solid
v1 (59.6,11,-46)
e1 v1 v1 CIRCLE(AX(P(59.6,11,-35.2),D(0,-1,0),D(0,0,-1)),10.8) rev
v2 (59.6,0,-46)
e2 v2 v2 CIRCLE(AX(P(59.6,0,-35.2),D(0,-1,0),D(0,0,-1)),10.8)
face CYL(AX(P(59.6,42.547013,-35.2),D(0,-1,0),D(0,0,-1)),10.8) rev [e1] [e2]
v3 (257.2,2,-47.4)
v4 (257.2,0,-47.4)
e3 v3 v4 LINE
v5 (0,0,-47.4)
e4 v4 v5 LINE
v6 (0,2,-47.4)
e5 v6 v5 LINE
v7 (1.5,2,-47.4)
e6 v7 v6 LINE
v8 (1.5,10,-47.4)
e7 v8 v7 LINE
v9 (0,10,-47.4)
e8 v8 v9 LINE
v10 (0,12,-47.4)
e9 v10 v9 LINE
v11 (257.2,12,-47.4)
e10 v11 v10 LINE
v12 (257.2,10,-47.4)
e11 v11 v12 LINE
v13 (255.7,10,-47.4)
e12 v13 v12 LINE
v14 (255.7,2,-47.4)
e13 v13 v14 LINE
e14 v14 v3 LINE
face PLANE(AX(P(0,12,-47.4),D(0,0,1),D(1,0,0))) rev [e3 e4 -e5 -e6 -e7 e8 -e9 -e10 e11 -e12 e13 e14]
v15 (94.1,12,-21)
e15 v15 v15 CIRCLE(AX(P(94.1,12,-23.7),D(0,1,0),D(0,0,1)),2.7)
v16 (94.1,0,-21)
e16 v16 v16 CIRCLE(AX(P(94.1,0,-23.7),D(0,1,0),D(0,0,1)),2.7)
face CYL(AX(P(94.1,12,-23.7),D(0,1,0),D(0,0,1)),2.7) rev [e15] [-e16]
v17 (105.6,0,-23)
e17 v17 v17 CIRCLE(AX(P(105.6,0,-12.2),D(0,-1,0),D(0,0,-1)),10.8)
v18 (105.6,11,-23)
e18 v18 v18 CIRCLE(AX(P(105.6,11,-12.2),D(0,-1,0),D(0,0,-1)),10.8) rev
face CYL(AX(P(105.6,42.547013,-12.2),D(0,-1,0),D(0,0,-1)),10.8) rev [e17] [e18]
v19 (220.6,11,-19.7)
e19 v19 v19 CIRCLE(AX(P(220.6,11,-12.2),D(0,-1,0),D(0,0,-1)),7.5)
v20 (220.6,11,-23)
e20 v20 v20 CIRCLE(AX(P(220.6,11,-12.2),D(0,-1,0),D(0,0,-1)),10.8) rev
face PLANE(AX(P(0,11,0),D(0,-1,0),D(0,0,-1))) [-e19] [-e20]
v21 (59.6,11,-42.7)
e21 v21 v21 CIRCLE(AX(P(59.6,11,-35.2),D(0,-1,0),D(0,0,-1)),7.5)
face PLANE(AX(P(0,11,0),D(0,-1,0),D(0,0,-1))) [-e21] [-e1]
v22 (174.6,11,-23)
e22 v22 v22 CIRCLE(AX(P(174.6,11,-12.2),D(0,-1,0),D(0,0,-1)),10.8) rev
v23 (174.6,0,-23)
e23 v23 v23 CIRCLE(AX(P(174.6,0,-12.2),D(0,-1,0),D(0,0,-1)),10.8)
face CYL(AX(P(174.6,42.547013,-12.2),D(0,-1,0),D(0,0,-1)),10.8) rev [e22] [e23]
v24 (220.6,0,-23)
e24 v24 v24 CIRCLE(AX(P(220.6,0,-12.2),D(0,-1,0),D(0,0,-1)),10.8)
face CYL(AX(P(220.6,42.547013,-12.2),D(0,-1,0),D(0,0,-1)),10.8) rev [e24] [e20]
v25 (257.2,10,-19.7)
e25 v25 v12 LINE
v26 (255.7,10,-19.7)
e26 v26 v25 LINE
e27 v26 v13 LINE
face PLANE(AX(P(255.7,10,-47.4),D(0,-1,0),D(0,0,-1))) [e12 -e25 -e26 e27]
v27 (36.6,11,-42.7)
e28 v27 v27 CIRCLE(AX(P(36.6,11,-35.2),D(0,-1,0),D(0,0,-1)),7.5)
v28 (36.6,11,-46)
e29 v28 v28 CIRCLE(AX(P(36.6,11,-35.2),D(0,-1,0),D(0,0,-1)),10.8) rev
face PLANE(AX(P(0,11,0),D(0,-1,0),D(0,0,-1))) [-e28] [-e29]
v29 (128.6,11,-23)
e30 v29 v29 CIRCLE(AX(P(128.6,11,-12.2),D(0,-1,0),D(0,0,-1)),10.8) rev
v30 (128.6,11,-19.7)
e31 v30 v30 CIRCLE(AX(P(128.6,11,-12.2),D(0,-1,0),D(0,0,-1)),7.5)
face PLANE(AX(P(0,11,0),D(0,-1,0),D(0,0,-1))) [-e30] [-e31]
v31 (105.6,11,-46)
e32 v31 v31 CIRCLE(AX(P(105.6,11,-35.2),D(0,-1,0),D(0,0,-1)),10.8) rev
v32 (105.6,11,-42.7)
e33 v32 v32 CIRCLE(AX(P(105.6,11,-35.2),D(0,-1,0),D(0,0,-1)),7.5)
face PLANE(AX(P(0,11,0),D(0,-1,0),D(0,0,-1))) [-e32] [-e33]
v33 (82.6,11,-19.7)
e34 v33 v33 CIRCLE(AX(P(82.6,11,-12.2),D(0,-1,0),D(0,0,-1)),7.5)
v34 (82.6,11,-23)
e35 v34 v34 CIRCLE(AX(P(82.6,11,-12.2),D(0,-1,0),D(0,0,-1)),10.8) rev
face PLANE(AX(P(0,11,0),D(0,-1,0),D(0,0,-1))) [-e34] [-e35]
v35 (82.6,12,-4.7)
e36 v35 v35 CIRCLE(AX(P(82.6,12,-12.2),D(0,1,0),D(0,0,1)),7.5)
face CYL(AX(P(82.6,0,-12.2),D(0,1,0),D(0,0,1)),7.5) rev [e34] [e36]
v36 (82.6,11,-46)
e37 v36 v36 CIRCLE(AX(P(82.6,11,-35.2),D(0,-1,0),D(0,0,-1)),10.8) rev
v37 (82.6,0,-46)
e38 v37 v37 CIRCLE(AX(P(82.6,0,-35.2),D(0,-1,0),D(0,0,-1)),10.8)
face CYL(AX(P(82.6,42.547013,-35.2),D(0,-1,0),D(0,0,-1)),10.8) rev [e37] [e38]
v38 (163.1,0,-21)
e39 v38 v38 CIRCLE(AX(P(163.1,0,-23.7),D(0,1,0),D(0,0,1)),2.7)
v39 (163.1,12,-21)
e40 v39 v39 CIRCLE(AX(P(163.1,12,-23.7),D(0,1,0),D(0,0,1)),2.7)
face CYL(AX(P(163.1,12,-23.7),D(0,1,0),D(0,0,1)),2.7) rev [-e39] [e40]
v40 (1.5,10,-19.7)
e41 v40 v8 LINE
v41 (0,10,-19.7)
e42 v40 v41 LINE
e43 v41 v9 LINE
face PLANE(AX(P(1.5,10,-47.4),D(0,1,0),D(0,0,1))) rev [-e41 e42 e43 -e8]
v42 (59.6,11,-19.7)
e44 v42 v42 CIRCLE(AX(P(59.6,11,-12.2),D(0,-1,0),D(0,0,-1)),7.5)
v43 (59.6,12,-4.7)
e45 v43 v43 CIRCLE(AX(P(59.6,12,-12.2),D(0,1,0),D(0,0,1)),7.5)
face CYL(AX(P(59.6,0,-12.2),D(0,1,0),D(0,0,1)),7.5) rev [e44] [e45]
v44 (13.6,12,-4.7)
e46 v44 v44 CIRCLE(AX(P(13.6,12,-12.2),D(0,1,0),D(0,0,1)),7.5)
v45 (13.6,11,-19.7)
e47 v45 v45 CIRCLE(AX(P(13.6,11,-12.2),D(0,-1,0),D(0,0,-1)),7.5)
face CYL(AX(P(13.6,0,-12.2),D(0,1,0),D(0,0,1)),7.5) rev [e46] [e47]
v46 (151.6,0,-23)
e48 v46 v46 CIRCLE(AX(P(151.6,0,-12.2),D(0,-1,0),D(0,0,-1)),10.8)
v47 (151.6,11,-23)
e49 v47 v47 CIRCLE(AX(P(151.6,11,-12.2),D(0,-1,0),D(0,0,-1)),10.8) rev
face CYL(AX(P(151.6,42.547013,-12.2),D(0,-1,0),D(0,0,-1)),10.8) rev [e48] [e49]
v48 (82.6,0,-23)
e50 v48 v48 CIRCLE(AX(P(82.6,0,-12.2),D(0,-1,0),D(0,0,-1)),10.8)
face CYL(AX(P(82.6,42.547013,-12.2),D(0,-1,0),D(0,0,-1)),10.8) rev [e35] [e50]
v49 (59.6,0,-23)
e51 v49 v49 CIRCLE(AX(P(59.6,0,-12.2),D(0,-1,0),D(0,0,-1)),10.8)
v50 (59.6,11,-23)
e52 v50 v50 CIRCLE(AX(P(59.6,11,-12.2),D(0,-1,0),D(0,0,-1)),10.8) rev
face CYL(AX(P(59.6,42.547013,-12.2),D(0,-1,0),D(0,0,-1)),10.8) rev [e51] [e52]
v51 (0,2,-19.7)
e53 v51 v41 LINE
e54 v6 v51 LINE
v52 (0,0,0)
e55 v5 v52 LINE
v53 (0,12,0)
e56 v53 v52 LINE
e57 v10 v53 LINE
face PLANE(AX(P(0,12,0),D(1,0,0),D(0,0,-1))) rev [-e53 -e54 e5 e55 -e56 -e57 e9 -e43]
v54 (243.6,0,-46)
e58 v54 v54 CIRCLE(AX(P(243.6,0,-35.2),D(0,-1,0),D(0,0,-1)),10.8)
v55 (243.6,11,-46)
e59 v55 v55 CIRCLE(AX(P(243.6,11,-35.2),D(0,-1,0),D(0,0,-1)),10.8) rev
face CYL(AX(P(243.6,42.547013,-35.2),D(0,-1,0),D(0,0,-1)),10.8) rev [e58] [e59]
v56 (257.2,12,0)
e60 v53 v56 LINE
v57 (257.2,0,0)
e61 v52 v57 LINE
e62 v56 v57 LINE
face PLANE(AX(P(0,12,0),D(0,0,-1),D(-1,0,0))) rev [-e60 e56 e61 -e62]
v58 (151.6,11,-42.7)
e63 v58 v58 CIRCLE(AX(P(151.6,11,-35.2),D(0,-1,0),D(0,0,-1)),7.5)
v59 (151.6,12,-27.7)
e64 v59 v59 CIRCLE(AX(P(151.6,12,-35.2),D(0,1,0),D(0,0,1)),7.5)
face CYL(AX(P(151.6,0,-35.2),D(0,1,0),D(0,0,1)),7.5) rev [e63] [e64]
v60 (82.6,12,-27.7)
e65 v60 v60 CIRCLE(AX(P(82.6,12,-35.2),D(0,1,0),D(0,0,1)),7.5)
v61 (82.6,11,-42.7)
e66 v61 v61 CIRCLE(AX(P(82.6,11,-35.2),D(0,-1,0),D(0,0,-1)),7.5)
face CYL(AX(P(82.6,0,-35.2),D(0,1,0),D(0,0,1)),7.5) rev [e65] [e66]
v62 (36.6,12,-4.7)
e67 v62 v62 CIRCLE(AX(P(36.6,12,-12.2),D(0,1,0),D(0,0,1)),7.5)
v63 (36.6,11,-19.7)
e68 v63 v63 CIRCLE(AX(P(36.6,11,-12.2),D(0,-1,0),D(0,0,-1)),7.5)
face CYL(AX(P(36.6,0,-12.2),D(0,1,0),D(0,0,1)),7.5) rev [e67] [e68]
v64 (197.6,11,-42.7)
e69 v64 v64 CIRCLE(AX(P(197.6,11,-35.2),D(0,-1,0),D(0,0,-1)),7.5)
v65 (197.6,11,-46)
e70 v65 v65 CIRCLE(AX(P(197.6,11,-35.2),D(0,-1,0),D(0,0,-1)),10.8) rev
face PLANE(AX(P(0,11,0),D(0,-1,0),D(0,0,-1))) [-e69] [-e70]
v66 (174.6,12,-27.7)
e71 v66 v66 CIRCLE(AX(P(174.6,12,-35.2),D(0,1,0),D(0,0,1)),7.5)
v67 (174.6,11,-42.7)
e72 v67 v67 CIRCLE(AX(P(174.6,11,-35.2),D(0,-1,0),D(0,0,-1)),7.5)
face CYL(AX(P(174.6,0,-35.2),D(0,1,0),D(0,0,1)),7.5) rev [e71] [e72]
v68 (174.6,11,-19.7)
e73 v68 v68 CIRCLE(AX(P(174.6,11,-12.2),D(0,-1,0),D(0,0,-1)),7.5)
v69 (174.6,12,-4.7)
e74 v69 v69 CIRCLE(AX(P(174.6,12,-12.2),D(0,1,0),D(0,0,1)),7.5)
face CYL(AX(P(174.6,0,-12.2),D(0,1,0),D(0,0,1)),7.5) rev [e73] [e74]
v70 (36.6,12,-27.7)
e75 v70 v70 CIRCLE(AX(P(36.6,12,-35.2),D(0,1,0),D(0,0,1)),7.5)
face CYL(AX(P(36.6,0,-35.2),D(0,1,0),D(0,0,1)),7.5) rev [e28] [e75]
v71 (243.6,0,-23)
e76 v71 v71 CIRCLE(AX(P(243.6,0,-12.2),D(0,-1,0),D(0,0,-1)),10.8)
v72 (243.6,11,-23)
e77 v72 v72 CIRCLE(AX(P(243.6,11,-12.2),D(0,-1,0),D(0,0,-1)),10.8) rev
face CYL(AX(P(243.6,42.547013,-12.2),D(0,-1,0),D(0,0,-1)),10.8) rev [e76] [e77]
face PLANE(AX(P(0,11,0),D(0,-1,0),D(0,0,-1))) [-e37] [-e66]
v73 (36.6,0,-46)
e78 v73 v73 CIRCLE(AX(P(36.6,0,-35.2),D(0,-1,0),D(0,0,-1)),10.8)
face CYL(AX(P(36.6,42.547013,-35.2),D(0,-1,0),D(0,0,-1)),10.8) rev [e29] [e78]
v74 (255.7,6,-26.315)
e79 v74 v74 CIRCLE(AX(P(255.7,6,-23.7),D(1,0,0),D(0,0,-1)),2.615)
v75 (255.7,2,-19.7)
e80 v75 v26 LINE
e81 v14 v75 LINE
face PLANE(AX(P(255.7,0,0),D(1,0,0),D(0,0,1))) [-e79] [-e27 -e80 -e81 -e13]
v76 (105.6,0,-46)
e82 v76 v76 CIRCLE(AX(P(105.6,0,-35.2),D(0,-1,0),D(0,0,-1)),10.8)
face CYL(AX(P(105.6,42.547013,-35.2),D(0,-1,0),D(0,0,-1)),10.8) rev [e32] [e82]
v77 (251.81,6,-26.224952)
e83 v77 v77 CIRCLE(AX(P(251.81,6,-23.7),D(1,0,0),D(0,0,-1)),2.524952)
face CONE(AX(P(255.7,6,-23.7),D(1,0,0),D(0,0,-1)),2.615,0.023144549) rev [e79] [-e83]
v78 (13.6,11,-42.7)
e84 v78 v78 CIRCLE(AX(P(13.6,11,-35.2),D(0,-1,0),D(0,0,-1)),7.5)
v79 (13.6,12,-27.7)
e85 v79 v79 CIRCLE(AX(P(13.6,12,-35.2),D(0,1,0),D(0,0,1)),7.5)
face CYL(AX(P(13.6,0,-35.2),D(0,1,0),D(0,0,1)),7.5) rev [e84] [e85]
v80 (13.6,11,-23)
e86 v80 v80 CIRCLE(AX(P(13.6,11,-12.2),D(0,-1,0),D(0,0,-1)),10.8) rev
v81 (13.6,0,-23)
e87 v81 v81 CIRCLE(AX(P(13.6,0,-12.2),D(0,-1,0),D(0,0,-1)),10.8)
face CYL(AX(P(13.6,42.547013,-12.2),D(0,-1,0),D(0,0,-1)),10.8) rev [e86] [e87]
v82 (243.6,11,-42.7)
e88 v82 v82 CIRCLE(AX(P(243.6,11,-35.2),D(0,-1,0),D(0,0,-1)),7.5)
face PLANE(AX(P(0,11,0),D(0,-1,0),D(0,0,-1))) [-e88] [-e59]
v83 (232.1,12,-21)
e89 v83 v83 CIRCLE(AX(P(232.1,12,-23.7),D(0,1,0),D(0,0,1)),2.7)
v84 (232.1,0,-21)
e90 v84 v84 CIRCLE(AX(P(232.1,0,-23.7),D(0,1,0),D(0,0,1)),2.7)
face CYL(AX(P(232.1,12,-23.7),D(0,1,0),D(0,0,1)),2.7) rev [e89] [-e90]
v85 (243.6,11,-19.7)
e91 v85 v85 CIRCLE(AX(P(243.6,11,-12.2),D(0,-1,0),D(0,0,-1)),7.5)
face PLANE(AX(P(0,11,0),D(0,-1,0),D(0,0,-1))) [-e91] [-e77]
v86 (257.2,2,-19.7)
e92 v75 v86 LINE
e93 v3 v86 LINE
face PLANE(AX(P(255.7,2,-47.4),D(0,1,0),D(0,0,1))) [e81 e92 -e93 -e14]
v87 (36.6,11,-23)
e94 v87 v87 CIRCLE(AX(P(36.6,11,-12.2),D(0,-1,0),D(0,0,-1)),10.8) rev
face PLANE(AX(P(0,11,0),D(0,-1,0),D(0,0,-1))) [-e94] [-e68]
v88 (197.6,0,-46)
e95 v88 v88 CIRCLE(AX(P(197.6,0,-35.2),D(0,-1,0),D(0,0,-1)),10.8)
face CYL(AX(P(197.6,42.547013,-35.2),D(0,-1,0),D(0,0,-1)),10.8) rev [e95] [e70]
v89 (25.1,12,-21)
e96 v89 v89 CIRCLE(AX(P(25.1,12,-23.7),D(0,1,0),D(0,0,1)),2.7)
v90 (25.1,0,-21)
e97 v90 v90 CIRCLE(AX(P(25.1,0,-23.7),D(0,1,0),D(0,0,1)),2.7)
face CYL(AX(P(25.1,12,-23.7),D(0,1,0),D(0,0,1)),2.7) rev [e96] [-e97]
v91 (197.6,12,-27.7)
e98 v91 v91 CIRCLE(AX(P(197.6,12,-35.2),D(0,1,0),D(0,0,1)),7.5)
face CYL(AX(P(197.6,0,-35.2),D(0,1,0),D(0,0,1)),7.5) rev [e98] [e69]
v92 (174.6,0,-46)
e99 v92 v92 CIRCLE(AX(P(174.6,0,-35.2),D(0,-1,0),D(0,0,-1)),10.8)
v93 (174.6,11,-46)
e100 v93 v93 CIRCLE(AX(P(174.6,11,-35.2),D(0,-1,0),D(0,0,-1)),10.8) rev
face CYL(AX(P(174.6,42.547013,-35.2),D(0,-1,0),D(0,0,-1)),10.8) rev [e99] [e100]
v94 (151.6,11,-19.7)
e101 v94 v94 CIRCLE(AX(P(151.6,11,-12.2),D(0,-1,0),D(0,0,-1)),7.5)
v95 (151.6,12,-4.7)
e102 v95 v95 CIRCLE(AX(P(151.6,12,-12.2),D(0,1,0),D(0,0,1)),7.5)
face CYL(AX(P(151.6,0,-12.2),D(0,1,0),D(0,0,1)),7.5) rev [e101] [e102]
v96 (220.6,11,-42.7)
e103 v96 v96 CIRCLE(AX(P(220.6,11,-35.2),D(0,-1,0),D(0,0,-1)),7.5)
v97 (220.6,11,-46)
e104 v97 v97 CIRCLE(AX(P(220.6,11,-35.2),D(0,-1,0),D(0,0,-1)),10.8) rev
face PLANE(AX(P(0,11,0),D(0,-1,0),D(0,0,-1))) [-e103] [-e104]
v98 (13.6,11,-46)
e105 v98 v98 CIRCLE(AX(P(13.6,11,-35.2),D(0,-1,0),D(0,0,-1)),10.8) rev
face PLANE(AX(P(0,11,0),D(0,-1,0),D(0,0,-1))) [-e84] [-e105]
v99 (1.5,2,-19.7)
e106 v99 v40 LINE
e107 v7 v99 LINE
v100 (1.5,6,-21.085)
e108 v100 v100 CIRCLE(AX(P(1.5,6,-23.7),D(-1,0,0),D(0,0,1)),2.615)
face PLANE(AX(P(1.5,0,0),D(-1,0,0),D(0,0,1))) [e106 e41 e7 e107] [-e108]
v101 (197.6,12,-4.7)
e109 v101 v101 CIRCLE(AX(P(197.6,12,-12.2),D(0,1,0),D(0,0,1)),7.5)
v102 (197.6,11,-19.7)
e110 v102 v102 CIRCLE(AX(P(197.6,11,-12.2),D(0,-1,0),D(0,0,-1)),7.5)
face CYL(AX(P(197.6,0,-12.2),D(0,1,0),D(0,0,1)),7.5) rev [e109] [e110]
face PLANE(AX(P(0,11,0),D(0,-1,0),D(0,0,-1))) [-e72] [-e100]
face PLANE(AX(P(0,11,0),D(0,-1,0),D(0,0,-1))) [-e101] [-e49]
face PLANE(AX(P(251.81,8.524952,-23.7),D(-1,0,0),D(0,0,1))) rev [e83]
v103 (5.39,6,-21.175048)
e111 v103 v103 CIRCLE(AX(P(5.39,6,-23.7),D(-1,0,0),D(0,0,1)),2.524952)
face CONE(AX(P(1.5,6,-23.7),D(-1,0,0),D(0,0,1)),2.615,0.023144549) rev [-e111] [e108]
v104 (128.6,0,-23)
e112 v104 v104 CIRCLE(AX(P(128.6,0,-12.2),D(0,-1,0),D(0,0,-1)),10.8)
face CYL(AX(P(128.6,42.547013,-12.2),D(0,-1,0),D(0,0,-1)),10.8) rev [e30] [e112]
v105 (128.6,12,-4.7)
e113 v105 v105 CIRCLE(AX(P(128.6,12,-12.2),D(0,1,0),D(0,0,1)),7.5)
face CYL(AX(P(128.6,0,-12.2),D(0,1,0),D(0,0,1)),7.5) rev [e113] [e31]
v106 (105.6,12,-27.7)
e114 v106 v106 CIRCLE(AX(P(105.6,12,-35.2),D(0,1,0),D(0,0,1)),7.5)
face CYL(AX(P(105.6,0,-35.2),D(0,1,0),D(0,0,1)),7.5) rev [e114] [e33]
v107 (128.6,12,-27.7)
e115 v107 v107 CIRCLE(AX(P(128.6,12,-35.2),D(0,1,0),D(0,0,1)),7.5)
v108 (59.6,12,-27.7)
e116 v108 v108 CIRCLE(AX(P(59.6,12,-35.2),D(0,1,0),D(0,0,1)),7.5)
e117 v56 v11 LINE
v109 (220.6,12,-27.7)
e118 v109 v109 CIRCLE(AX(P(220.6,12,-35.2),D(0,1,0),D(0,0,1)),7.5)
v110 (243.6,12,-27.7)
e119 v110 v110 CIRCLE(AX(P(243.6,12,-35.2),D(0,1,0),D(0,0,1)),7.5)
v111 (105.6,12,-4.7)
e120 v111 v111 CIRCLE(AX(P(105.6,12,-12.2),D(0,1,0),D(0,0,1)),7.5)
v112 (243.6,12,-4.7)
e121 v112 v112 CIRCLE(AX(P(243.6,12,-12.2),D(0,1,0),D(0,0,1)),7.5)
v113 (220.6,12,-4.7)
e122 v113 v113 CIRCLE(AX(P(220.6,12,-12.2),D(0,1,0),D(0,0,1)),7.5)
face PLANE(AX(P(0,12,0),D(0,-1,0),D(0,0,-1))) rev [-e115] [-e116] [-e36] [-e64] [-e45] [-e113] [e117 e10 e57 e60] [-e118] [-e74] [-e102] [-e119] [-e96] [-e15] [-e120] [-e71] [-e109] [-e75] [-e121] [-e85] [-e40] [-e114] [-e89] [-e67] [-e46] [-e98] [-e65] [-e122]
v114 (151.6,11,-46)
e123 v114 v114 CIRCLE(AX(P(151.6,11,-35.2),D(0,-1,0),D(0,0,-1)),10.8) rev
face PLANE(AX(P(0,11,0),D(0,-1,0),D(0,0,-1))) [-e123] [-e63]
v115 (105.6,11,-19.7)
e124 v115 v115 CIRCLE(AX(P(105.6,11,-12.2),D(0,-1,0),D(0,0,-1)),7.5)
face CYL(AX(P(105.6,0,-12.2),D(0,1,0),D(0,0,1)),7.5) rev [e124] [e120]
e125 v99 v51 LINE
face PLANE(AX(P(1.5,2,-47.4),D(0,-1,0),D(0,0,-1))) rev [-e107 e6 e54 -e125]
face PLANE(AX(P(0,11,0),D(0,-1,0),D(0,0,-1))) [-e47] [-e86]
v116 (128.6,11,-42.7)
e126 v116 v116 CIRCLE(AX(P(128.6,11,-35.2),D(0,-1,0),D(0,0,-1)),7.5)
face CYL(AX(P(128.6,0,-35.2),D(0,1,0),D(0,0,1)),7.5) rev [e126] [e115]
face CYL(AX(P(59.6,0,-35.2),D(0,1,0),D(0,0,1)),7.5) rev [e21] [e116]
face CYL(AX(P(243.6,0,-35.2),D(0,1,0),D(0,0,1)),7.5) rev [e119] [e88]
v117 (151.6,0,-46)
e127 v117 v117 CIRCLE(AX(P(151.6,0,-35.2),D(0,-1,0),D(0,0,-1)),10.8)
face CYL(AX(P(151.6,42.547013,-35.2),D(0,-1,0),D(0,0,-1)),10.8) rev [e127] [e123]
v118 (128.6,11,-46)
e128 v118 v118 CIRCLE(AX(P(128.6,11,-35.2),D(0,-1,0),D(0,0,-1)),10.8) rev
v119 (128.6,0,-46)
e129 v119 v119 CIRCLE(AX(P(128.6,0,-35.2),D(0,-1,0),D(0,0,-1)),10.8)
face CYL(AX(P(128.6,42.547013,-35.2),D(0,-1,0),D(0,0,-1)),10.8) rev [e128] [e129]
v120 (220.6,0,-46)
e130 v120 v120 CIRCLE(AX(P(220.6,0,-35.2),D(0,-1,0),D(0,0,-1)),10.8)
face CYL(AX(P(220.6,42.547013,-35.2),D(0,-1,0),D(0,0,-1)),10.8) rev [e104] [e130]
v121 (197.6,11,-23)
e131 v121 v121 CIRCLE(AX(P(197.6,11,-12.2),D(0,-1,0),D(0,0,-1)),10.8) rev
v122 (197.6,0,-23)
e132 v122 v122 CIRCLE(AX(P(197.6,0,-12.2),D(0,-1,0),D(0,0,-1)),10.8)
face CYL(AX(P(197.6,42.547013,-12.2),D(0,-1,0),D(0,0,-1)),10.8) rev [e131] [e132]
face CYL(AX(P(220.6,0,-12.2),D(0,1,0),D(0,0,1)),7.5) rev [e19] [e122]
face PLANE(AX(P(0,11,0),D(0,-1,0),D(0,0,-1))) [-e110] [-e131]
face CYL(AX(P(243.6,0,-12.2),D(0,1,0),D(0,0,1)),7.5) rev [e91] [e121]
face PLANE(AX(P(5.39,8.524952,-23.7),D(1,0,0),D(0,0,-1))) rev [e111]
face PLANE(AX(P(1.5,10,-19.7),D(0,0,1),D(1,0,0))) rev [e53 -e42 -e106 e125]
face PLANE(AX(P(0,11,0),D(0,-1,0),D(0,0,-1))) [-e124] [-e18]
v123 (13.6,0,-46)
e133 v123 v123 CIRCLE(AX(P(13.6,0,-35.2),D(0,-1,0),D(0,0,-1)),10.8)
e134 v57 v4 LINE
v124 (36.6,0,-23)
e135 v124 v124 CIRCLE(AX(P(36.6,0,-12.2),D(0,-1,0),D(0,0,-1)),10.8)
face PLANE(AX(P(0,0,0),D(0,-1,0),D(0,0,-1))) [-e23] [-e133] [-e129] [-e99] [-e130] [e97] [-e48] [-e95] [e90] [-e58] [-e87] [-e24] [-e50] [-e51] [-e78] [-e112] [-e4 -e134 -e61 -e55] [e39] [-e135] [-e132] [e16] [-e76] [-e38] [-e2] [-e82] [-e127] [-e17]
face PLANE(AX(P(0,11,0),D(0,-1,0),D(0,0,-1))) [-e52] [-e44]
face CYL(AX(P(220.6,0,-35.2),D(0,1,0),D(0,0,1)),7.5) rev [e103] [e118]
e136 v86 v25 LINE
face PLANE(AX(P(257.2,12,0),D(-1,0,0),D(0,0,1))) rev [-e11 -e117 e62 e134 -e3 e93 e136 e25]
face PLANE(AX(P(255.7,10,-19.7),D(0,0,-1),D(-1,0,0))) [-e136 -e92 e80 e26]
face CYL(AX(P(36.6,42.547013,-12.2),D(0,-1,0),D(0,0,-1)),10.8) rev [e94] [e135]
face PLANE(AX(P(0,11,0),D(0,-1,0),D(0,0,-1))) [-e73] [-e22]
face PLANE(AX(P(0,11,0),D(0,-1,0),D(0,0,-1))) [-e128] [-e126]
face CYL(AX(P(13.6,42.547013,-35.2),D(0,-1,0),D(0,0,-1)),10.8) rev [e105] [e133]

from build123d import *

# Parameters (mm, degrees)
SKETCH1_W               = 257.2
SKETCH1_H               = 47.4
BOSS_EXTRUDE1_DEPTH     = 12
CUT_EXTRUDE1_START      = -12
SKETCH2_R               = 10.8
CUT_EXTRUDE1_DEPTH      = 11
SKETCH17_R              = 7.5
CUT_EXTRUDE5_DEPTH      = 262.806417034
LPATTERN1_COUNT         = 2
LPATTERN1_PITCH         = 23
LPATTERN1_COUNT_DIR2    = 11
LPATTERN1_PITCH_DIR2    = 23
ADVANCEDHOLE1_OUTLINE_R = 2.7
ADVANCEDHOLE1_DEPTH     = 12
SKETCH9_W               = 27.7
SKETCH9_H               = 8
CUT_EXTRUDE4_DEPTH      = 1.5


# Read off the part's stored shape, not the designer's step: AdvancedHole1, AdvancedHole3
with BuildPart() as part:
    # Sketch1 → Boss-Extrude1 (new body)
    with BuildSketch(Plane(origin=(0, 0, 0), x_dir=(1, 0, 0), z_dir=(0, 1, 0))):
        with Locations((128.6, 23.7)):
            Rectangle(SKETCH1_W, SKETCH1_H)
    extrude(amount=BOSS_EXTRUDE1_DEPTH)

    # Sketch2 → Cut-Extrude1 (cut)
    with BuildSketch(Plane(origin=(0, 12, 0), x_dir=(1, 0, 0), z_dir=(0, 1, 0)).offset(CUT_EXTRUDE1_START)):
        with Locations(Location((13.6, 12.2, 0), (0, 0, 90))):
            Circle(SKETCH2_R)
    cut_extrude1 = extrude(amount=CUT_EXTRUDE1_DEPTH, mode=Mode.SUBTRACT)

    # Sketch17 → Cut-Extrude5 (cut, through all)
    with BuildSketch(Plane(origin=(0, 12, 0), x_dir=(1, 0, 0), z_dir=(0, 1, 0))):
        with Locations(Location((13.6, 12.2, 0), (0, 0, 270))):
            Circle(SKETCH17_R)
    cut_extrude5 = extrude(amount=-CUT_EXTRUDE5_DEPTH, mode=Mode.SUBTRACT)

    # LPattern1: Cut-Extrude1, Cut-Extrude5 2 × 11
    with Locations(*[(j * LPATTERN1_PITCH_DIR2, 0, -i * LPATTERN1_PITCH) for i in range(LPATTERN1_COUNT) for j in range(LPATTERN1_COUNT_DIR2) if (i, j) != (0, 0)]):
        add(cut_extrude1, mode=Mode.SUBTRACT)
        add(cut_extrude5, mode=Mode.SUBTRACT)

    # AdvancedHole1 outline → AdvancedHole1 (cut)
    with BuildSketch(Plane(origin=(0, 0, 0), x_dir=(1, 0, 0), z_dir=(0, 1, 0))):
        with Locations((163.1, 23.7)):
            Circle(ADVANCEDHOLE1_OUTLINE_R)
        with Locations((94.1, 23.7)):
            Circle(ADVANCEDHOLE1_OUTLINE_R)
        with Locations((25.1, 23.7)):
            Circle(ADVANCEDHOLE1_OUTLINE_R)
        with Locations((232.1, 23.7)):
            Circle(ADVANCEDHOLE1_OUTLINE_R)
    extrude(amount=ADVANCEDHOLE1_DEPTH, mode=Mode.SUBTRACT)

    # Sketch9 → Cut-Extrude4 (cut)
    with BuildSketch(Plane.ZY):
        with Locations((-33.55, 6)):
            Rectangle(SKETCH9_W, SKETCH9_H)
    cut_extrude4 = extrude(amount=-CUT_EXTRUDE4_DEPTH, mode=Mode.SUBTRACT)

    # AdvancedHole3 outline → AdvancedHole3 (revolve, cut)
    with BuildSketch(Plane(origin=(0, 6, -23.7), x_dir=(0, 1, 0), z_dir=(0, 0, -1))):
        Polygon((2.615, 1.5), (2.524951623, 5.39), (0, 5.39), (0, 1.5), align=None)
    advancedhole3 = revolve(axis=Axis((0, 6, -23.7), (1, 0, 0)), mode=Mode.SUBTRACT)

    # Mirror1: Cut-Extrude4, AdvancedHole3 across plane
    add(cut_extrude4.mirror(Plane(origin=(128.6, 0, 0), x_dir=(0, 0, 1), z_dir=(1, 0, 0))), mode=Mode.SUBTRACT)
    add(advancedhole3.mirror(Plane(origin=(128.6, 0, 0), x_dir=(0, 0, 1), z_dir=(1, 0, 0))), mode=Mode.SUBTRACT)


solid = part.part
